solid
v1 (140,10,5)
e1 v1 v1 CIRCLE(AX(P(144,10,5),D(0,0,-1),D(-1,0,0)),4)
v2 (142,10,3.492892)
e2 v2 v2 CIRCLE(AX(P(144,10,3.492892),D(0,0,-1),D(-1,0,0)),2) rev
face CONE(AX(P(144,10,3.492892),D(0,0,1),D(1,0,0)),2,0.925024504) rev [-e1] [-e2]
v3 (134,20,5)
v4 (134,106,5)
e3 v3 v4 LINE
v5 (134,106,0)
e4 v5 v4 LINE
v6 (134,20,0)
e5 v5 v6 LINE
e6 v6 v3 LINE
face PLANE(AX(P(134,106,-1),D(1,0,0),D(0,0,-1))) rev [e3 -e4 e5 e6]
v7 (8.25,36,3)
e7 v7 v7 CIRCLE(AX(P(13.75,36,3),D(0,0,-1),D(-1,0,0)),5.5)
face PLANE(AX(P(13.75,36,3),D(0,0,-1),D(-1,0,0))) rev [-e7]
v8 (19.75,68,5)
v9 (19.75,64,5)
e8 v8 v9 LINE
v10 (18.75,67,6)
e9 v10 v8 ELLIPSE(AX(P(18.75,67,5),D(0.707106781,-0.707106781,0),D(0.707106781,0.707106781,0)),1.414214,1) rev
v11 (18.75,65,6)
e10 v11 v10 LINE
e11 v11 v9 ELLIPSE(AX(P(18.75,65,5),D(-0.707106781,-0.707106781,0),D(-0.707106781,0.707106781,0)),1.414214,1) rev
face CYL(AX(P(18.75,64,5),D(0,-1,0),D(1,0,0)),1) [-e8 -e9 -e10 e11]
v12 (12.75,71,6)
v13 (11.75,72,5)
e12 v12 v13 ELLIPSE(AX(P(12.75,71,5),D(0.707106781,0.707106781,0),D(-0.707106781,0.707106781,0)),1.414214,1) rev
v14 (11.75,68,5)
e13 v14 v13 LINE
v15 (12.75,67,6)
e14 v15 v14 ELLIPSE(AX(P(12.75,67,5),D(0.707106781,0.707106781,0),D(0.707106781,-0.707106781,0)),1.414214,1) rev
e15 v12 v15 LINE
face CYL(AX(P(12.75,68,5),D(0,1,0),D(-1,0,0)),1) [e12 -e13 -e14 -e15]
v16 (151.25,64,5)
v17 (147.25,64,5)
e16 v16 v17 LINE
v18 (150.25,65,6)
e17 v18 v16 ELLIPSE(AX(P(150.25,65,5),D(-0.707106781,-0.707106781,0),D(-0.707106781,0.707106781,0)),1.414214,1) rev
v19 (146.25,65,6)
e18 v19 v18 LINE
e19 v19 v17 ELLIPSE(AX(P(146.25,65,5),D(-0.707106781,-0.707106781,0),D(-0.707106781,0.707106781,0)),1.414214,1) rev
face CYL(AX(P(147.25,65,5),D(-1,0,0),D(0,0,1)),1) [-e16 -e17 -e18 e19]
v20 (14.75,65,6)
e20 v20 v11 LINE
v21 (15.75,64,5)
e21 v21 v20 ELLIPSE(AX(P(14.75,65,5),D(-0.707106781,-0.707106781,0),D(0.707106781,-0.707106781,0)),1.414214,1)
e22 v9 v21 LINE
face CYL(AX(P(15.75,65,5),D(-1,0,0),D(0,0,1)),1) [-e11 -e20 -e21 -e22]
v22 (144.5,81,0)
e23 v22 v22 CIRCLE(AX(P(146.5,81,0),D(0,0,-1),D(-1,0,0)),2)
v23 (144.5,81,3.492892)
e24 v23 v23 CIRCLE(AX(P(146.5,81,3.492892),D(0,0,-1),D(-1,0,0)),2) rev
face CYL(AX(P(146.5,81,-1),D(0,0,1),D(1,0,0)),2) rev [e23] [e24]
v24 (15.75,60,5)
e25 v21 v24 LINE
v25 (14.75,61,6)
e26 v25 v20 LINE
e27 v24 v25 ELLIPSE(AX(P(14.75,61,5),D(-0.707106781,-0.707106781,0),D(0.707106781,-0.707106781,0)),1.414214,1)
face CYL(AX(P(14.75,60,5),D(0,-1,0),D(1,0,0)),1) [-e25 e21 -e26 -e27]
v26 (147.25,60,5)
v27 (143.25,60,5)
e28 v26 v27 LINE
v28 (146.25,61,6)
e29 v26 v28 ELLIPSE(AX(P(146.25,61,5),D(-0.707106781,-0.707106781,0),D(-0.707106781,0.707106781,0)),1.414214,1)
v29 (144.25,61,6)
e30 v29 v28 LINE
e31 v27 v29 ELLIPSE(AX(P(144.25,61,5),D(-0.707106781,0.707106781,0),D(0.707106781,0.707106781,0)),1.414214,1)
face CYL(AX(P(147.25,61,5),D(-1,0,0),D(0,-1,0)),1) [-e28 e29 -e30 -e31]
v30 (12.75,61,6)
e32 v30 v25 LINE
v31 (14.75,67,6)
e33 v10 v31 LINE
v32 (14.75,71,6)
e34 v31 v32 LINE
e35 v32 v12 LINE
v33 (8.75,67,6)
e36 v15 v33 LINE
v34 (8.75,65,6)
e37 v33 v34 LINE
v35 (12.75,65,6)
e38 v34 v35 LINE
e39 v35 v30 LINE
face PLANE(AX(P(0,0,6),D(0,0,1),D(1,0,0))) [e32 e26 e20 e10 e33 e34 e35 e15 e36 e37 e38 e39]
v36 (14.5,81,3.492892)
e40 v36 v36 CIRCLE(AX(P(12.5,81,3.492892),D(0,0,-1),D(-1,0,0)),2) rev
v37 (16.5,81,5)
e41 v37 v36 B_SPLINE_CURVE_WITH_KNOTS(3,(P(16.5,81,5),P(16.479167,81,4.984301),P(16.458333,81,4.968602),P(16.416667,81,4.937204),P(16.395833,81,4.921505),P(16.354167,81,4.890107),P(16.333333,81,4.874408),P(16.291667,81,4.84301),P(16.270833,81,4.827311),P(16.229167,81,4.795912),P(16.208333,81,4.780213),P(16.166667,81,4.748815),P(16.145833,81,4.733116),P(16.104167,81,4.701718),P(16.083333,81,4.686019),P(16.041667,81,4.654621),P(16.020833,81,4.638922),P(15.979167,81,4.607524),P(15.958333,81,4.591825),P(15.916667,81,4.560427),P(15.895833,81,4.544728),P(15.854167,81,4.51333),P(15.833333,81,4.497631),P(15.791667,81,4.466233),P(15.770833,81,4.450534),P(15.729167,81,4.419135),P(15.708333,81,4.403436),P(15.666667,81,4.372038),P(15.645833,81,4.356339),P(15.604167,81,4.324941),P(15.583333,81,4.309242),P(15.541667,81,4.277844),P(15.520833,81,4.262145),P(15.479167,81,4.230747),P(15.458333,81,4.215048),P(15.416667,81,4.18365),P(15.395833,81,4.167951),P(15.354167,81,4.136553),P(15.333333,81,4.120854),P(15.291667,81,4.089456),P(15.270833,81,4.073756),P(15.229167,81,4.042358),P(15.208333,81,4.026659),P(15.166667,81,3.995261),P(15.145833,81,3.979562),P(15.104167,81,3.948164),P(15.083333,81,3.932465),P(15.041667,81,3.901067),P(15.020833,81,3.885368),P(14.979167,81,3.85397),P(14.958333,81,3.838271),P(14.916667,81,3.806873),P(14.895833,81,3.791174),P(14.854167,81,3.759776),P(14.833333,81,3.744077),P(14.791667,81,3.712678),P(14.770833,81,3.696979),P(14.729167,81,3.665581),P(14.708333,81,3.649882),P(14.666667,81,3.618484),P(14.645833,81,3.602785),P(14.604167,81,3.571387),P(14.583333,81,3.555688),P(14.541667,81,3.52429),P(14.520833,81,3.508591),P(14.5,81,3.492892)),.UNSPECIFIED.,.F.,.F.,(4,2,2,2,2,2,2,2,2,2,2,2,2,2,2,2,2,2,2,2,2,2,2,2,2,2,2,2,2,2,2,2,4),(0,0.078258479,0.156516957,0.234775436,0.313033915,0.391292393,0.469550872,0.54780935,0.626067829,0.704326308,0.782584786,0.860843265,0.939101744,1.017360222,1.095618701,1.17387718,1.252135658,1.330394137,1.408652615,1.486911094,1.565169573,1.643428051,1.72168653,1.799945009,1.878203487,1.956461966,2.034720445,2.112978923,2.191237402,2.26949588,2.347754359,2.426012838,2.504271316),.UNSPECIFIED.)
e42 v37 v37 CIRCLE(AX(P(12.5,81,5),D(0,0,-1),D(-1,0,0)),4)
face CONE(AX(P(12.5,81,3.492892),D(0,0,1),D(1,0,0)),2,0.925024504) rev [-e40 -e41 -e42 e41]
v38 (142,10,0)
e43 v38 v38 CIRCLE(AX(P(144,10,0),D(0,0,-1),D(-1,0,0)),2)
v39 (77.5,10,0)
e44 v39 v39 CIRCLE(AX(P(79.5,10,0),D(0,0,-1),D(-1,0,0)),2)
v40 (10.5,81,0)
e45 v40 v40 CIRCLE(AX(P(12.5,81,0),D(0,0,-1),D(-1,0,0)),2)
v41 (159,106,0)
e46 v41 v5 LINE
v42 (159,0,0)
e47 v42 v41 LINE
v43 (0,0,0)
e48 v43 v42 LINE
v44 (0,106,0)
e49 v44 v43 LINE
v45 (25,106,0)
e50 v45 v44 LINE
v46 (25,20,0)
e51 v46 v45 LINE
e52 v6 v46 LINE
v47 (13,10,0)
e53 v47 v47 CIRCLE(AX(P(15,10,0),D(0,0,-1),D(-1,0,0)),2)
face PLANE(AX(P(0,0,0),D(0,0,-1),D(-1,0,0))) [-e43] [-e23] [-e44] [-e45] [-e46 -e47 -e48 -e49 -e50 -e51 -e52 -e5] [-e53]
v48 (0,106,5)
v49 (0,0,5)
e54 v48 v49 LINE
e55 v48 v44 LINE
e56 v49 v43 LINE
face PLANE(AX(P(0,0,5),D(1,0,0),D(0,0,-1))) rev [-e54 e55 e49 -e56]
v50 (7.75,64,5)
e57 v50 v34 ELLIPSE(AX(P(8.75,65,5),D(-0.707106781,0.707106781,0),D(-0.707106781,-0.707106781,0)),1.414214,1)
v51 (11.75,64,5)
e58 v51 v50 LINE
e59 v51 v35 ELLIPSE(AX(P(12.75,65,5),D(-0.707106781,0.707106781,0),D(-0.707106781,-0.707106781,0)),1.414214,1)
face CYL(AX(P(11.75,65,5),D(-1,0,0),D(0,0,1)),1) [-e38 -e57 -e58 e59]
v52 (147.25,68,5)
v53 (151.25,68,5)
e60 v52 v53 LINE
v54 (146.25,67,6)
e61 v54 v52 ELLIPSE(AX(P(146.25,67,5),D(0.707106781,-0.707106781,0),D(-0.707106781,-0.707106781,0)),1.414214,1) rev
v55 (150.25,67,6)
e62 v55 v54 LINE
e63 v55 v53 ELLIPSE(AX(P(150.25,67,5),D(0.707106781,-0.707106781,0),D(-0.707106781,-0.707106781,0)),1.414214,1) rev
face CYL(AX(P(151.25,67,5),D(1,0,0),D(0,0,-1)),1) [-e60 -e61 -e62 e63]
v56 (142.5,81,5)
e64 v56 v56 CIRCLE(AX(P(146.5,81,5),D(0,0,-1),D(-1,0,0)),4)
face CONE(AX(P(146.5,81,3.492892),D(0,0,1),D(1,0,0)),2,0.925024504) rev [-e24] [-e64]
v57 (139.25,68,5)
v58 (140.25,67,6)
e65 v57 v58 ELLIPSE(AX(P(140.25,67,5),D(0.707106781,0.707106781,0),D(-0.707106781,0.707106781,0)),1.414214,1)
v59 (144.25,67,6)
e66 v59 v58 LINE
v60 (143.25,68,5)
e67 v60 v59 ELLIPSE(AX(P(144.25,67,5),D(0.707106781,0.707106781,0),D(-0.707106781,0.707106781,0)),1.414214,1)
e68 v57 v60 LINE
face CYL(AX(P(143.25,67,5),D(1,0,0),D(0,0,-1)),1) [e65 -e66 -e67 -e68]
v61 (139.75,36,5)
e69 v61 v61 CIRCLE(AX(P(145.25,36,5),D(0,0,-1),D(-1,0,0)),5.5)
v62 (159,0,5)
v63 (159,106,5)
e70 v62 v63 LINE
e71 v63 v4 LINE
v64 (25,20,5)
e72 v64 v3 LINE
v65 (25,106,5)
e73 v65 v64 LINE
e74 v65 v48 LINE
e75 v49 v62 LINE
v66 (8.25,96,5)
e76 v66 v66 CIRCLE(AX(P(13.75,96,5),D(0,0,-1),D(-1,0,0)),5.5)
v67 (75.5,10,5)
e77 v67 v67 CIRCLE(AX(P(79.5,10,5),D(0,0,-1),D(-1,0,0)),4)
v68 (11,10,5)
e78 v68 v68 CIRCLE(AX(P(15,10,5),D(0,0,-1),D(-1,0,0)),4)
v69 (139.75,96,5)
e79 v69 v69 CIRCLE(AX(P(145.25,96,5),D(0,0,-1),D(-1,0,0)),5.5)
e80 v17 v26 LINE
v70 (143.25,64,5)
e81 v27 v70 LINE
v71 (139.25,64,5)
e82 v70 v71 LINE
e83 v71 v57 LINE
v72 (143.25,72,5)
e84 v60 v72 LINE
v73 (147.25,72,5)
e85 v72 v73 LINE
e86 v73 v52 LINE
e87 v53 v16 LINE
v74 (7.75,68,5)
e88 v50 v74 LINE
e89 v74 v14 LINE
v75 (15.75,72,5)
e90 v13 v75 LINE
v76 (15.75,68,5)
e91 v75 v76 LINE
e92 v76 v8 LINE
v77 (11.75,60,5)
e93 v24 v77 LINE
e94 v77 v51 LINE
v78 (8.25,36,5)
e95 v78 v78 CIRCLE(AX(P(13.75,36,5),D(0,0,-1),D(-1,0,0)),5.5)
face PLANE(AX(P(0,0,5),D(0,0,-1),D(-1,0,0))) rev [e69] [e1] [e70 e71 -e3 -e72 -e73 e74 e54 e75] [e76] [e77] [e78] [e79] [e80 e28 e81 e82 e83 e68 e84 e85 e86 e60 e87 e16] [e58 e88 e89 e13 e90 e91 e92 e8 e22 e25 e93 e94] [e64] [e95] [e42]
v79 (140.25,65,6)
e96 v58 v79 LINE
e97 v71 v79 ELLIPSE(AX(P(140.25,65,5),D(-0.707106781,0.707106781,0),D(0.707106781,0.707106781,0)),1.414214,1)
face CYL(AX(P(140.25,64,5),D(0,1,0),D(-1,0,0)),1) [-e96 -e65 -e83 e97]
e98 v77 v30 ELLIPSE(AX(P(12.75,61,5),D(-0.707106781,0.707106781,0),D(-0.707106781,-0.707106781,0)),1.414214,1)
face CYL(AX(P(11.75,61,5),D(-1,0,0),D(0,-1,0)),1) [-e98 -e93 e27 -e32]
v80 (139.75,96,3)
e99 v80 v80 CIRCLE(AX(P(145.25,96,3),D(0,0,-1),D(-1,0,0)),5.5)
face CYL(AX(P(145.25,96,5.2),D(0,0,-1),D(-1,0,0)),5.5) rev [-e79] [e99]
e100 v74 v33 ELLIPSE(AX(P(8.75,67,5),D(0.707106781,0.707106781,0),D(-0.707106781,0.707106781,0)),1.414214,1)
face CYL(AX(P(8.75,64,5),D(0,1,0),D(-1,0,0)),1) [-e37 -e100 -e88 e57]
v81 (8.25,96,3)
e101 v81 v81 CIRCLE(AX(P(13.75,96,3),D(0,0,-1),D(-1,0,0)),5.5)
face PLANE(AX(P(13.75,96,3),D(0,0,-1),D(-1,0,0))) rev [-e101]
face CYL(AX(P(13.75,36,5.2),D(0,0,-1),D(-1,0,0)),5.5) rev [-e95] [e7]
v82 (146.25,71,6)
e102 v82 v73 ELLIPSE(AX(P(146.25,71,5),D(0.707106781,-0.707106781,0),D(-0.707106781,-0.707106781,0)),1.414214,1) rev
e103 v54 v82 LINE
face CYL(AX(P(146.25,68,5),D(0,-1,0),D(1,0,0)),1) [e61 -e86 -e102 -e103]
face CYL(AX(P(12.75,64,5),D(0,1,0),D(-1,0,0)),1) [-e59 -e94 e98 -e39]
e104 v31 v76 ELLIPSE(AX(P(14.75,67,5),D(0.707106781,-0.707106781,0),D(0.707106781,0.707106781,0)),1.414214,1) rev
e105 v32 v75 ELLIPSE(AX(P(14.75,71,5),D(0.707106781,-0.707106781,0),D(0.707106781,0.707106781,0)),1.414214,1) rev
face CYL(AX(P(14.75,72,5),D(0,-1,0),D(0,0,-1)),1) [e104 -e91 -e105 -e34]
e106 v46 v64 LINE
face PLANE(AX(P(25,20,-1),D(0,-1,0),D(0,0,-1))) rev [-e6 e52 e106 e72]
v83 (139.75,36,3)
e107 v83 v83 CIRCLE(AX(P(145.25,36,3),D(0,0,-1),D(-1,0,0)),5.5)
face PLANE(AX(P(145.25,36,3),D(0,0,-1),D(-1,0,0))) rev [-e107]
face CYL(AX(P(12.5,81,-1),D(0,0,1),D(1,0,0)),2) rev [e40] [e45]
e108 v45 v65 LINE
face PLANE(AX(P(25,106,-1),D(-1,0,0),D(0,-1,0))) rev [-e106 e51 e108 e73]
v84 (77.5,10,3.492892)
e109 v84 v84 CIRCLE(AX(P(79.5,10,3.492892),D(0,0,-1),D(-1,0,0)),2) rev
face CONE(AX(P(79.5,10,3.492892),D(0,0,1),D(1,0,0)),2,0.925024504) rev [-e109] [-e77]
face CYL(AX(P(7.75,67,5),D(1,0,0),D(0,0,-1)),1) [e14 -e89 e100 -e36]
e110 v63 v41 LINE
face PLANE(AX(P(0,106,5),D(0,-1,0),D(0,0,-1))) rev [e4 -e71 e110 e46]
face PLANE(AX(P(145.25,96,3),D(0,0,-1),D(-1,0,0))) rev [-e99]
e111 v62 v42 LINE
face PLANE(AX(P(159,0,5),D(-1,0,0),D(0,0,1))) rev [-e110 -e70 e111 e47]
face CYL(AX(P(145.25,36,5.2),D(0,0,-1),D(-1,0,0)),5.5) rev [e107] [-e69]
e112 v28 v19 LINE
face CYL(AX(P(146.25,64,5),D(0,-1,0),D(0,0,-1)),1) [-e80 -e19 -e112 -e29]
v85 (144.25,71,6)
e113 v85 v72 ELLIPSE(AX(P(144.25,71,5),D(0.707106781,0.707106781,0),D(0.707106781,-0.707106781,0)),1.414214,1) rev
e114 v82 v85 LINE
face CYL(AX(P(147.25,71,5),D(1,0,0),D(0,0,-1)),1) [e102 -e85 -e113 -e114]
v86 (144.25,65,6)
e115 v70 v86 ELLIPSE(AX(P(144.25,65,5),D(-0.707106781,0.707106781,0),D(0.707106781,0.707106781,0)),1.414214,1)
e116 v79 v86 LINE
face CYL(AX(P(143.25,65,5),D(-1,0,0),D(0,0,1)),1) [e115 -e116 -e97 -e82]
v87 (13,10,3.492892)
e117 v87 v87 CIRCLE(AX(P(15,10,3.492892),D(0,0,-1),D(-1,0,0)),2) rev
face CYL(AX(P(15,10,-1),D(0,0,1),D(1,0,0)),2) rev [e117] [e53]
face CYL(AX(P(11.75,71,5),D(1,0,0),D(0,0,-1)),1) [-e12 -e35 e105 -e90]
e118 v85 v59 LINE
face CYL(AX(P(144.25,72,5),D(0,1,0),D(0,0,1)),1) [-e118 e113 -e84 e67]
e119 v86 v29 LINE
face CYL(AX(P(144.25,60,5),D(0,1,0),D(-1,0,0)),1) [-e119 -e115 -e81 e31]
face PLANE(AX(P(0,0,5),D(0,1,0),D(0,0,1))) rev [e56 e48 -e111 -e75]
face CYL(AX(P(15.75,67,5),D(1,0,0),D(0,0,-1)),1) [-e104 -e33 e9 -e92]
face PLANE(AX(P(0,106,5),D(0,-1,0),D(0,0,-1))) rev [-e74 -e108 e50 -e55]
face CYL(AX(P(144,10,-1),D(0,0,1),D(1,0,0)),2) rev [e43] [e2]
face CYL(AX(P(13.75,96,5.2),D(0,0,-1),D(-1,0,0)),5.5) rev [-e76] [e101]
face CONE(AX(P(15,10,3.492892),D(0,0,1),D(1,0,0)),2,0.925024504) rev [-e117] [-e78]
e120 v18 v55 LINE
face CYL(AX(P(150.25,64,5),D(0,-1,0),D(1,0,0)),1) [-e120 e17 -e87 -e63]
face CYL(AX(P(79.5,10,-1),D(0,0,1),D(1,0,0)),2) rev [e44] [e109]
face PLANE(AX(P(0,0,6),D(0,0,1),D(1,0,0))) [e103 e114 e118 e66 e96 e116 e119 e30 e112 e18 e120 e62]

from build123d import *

# Parameters (mm, degrees)
ESQUISSE1_W             = 159
ESQUISSE1_H             = 106
BOSS_EXTRU_1_DEPTH      = 5
ENL_V_START             = -3
ESQUISSE3_R             = 5.5
ENL_V_MAT_EXTRU_2_DEPTH = 2.2
ESQUISSE4_W             = 109
ESQUISSE4_H             = 86
ENL_V_MAT_EXTRU_3_DEPTH = 6
ESQUISSE5_R             = 2
ENL_V_MAT_EXTRU_4_DEPTH = 6
CHANFREIN1_SIZE         = 2
CHANFREIN1_SIZE2        = 1.5071081
BOSS_EXTRU_2_START      = -5
BOSS_EXTRU_2_DEPTH      = 1
CONG_2_R                = 1


with BuildPart() as part:
    # Esquisse1 → Boss.-Extru.1 (new body)
    with BuildSketch(Plane.XY):
        with Locations((79.5, 53)):
            Rectangle(ESQUISSE1_W, ESQUISSE1_H)
    extrude(amount=BOSS_EXTRU_1_DEPTH)

    # Esquisse3 → Enlèv. mat.-Extru.2 (cut)
    with BuildSketch(Plane(origin=(0, 0, 0), x_dir=(-1, 0, 0), z_dir=(0, 0, -1)).offset(ENL_V_START)):
        with Locations((-13.75, 36)):
            Circle(ESQUISSE3_R)
        with Locations((-13.75, 96)):
            Circle(ESQUISSE3_R)
        with Locations((-145.25, 36)):
            Circle(ESQUISSE3_R)
        with Locations((-145.25, 96)):
            Circle(ESQUISSE3_R)
    extrude(amount=-ENL_V_MAT_EXTRU_2_DEPTH, mode=Mode.SUBTRACT)

    # Esquisse4 → Enlèv. mat.-Extru.3 (cut)
    with BuildSketch(Plane.XY.offset(5)):
        with Locations((79.5, 63)):
            Rectangle(ESQUISSE4_W, ESQUISSE4_H)
    extrude(amount=-ENL_V_MAT_EXTRU_3_DEPTH, mode=Mode.SUBTRACT)

    # Esquisse5 → Enlèv. mat.-Extru.4 (cut)
    with BuildSketch(Plane.XY.offset(5)):
        with Locations((15, 10)):
            Circle(ESQUISSE5_R)
        with Locations((144, 10)):
            Circle(ESQUISSE5_R)
        with Locations((12.5, 81)):
            Circle(ESQUISSE5_R)
        with Locations((146.5, 81)):
            Circle(ESQUISSE5_R)
        with Locations((79.5, 10)):
            Circle(ESQUISSE5_R)
    extrude(amount=-ENL_V_MAT_EXTRU_4_DEPTH, mode=Mode.SUBTRACT)

    # Chanfrein1
    chanfrein1_edges = [part.edges().sort_by_distance(p)[0] for p in [
        (13, 10, 5),
        (142, 10, 5),
        (10.5, 81, 5),
        (144.5, 81, 5),
        (77.5, 10, 5),
    ]]
    chanfrein1_side = [part.faces().sort_by_distance(p)[0] for p in [
        (1.910942176, 53, 5),
    ]]
    chamfer(chanfrein1_edges, length=CHANFREIN1_SIZE, length2=CHANFREIN1_SIZE2, reference=chanfrein1_side[0])

    # Esquisse2 → Boss.-Extru.2 (add)
    with BuildSketch(Plane(origin=(0, 0, 0), x_dir=(-1, 0, 0), z_dir=(0, 0, -1)).offset(BOSS_EXTRU_2_START)):
        Polygon((-11.75, 64), (-7.75, 64), (-7.75, 68), (-11.75, 68), (-11.75, 72), (-15.75, 72), (-15.75, 68), (-19.75, 68), (-19.75, 64), (-15.75, 64), (-15.75, 60), (-11.75, 60), align=None)
        Polygon((-143.25, 64), (-139.25, 64), (-139.25, 68), (-143.25, 68), (-143.25, 72), (-147.25, 72), (-147.25, 68), (-151.25, 68), (-151.25, 64), (-147.25, 64), (-147.25, 60), (-143.25, 60), align=None)
    extrude(amount=-BOSS_EXTRU_2_DEPTH)

    # Congé2
    cong_2_edges = [part.edges().sort_by_distance(p)[0] for p in [
        (11.75, 62, 6),
        (13.75, 60, 6),
        (15.75, 62, 6),
        (19.75, 66, 6),
        (17.75, 64, 6),
        (17.75, 68, 6),
        (15.75, 70, 6),
        (13.75, 72, 6),
        (11.75, 70, 6),
        (143.25, 70, 6),
        (145.25, 72, 6),
        (147.25, 70, 6),
        (149.25, 68, 6),
        (151.25, 66, 6),
        (149.25, 64, 6),
        (147.25, 62, 6),
        (145.25, 60, 6),
        (143.25, 62, 6),
        (141.25, 64, 6),
        (141.25, 68, 6),
        (139.25, 66, 6),
        (9.75, 68, 6),
        (7.75, 66, 6),
        (9.75, 64, 6),
    ]]
    fillet(cong_2_edges, radius=CONG_2_R - 0.0001)  # a hair under: the kernel refuses the full size


solid = part.part
